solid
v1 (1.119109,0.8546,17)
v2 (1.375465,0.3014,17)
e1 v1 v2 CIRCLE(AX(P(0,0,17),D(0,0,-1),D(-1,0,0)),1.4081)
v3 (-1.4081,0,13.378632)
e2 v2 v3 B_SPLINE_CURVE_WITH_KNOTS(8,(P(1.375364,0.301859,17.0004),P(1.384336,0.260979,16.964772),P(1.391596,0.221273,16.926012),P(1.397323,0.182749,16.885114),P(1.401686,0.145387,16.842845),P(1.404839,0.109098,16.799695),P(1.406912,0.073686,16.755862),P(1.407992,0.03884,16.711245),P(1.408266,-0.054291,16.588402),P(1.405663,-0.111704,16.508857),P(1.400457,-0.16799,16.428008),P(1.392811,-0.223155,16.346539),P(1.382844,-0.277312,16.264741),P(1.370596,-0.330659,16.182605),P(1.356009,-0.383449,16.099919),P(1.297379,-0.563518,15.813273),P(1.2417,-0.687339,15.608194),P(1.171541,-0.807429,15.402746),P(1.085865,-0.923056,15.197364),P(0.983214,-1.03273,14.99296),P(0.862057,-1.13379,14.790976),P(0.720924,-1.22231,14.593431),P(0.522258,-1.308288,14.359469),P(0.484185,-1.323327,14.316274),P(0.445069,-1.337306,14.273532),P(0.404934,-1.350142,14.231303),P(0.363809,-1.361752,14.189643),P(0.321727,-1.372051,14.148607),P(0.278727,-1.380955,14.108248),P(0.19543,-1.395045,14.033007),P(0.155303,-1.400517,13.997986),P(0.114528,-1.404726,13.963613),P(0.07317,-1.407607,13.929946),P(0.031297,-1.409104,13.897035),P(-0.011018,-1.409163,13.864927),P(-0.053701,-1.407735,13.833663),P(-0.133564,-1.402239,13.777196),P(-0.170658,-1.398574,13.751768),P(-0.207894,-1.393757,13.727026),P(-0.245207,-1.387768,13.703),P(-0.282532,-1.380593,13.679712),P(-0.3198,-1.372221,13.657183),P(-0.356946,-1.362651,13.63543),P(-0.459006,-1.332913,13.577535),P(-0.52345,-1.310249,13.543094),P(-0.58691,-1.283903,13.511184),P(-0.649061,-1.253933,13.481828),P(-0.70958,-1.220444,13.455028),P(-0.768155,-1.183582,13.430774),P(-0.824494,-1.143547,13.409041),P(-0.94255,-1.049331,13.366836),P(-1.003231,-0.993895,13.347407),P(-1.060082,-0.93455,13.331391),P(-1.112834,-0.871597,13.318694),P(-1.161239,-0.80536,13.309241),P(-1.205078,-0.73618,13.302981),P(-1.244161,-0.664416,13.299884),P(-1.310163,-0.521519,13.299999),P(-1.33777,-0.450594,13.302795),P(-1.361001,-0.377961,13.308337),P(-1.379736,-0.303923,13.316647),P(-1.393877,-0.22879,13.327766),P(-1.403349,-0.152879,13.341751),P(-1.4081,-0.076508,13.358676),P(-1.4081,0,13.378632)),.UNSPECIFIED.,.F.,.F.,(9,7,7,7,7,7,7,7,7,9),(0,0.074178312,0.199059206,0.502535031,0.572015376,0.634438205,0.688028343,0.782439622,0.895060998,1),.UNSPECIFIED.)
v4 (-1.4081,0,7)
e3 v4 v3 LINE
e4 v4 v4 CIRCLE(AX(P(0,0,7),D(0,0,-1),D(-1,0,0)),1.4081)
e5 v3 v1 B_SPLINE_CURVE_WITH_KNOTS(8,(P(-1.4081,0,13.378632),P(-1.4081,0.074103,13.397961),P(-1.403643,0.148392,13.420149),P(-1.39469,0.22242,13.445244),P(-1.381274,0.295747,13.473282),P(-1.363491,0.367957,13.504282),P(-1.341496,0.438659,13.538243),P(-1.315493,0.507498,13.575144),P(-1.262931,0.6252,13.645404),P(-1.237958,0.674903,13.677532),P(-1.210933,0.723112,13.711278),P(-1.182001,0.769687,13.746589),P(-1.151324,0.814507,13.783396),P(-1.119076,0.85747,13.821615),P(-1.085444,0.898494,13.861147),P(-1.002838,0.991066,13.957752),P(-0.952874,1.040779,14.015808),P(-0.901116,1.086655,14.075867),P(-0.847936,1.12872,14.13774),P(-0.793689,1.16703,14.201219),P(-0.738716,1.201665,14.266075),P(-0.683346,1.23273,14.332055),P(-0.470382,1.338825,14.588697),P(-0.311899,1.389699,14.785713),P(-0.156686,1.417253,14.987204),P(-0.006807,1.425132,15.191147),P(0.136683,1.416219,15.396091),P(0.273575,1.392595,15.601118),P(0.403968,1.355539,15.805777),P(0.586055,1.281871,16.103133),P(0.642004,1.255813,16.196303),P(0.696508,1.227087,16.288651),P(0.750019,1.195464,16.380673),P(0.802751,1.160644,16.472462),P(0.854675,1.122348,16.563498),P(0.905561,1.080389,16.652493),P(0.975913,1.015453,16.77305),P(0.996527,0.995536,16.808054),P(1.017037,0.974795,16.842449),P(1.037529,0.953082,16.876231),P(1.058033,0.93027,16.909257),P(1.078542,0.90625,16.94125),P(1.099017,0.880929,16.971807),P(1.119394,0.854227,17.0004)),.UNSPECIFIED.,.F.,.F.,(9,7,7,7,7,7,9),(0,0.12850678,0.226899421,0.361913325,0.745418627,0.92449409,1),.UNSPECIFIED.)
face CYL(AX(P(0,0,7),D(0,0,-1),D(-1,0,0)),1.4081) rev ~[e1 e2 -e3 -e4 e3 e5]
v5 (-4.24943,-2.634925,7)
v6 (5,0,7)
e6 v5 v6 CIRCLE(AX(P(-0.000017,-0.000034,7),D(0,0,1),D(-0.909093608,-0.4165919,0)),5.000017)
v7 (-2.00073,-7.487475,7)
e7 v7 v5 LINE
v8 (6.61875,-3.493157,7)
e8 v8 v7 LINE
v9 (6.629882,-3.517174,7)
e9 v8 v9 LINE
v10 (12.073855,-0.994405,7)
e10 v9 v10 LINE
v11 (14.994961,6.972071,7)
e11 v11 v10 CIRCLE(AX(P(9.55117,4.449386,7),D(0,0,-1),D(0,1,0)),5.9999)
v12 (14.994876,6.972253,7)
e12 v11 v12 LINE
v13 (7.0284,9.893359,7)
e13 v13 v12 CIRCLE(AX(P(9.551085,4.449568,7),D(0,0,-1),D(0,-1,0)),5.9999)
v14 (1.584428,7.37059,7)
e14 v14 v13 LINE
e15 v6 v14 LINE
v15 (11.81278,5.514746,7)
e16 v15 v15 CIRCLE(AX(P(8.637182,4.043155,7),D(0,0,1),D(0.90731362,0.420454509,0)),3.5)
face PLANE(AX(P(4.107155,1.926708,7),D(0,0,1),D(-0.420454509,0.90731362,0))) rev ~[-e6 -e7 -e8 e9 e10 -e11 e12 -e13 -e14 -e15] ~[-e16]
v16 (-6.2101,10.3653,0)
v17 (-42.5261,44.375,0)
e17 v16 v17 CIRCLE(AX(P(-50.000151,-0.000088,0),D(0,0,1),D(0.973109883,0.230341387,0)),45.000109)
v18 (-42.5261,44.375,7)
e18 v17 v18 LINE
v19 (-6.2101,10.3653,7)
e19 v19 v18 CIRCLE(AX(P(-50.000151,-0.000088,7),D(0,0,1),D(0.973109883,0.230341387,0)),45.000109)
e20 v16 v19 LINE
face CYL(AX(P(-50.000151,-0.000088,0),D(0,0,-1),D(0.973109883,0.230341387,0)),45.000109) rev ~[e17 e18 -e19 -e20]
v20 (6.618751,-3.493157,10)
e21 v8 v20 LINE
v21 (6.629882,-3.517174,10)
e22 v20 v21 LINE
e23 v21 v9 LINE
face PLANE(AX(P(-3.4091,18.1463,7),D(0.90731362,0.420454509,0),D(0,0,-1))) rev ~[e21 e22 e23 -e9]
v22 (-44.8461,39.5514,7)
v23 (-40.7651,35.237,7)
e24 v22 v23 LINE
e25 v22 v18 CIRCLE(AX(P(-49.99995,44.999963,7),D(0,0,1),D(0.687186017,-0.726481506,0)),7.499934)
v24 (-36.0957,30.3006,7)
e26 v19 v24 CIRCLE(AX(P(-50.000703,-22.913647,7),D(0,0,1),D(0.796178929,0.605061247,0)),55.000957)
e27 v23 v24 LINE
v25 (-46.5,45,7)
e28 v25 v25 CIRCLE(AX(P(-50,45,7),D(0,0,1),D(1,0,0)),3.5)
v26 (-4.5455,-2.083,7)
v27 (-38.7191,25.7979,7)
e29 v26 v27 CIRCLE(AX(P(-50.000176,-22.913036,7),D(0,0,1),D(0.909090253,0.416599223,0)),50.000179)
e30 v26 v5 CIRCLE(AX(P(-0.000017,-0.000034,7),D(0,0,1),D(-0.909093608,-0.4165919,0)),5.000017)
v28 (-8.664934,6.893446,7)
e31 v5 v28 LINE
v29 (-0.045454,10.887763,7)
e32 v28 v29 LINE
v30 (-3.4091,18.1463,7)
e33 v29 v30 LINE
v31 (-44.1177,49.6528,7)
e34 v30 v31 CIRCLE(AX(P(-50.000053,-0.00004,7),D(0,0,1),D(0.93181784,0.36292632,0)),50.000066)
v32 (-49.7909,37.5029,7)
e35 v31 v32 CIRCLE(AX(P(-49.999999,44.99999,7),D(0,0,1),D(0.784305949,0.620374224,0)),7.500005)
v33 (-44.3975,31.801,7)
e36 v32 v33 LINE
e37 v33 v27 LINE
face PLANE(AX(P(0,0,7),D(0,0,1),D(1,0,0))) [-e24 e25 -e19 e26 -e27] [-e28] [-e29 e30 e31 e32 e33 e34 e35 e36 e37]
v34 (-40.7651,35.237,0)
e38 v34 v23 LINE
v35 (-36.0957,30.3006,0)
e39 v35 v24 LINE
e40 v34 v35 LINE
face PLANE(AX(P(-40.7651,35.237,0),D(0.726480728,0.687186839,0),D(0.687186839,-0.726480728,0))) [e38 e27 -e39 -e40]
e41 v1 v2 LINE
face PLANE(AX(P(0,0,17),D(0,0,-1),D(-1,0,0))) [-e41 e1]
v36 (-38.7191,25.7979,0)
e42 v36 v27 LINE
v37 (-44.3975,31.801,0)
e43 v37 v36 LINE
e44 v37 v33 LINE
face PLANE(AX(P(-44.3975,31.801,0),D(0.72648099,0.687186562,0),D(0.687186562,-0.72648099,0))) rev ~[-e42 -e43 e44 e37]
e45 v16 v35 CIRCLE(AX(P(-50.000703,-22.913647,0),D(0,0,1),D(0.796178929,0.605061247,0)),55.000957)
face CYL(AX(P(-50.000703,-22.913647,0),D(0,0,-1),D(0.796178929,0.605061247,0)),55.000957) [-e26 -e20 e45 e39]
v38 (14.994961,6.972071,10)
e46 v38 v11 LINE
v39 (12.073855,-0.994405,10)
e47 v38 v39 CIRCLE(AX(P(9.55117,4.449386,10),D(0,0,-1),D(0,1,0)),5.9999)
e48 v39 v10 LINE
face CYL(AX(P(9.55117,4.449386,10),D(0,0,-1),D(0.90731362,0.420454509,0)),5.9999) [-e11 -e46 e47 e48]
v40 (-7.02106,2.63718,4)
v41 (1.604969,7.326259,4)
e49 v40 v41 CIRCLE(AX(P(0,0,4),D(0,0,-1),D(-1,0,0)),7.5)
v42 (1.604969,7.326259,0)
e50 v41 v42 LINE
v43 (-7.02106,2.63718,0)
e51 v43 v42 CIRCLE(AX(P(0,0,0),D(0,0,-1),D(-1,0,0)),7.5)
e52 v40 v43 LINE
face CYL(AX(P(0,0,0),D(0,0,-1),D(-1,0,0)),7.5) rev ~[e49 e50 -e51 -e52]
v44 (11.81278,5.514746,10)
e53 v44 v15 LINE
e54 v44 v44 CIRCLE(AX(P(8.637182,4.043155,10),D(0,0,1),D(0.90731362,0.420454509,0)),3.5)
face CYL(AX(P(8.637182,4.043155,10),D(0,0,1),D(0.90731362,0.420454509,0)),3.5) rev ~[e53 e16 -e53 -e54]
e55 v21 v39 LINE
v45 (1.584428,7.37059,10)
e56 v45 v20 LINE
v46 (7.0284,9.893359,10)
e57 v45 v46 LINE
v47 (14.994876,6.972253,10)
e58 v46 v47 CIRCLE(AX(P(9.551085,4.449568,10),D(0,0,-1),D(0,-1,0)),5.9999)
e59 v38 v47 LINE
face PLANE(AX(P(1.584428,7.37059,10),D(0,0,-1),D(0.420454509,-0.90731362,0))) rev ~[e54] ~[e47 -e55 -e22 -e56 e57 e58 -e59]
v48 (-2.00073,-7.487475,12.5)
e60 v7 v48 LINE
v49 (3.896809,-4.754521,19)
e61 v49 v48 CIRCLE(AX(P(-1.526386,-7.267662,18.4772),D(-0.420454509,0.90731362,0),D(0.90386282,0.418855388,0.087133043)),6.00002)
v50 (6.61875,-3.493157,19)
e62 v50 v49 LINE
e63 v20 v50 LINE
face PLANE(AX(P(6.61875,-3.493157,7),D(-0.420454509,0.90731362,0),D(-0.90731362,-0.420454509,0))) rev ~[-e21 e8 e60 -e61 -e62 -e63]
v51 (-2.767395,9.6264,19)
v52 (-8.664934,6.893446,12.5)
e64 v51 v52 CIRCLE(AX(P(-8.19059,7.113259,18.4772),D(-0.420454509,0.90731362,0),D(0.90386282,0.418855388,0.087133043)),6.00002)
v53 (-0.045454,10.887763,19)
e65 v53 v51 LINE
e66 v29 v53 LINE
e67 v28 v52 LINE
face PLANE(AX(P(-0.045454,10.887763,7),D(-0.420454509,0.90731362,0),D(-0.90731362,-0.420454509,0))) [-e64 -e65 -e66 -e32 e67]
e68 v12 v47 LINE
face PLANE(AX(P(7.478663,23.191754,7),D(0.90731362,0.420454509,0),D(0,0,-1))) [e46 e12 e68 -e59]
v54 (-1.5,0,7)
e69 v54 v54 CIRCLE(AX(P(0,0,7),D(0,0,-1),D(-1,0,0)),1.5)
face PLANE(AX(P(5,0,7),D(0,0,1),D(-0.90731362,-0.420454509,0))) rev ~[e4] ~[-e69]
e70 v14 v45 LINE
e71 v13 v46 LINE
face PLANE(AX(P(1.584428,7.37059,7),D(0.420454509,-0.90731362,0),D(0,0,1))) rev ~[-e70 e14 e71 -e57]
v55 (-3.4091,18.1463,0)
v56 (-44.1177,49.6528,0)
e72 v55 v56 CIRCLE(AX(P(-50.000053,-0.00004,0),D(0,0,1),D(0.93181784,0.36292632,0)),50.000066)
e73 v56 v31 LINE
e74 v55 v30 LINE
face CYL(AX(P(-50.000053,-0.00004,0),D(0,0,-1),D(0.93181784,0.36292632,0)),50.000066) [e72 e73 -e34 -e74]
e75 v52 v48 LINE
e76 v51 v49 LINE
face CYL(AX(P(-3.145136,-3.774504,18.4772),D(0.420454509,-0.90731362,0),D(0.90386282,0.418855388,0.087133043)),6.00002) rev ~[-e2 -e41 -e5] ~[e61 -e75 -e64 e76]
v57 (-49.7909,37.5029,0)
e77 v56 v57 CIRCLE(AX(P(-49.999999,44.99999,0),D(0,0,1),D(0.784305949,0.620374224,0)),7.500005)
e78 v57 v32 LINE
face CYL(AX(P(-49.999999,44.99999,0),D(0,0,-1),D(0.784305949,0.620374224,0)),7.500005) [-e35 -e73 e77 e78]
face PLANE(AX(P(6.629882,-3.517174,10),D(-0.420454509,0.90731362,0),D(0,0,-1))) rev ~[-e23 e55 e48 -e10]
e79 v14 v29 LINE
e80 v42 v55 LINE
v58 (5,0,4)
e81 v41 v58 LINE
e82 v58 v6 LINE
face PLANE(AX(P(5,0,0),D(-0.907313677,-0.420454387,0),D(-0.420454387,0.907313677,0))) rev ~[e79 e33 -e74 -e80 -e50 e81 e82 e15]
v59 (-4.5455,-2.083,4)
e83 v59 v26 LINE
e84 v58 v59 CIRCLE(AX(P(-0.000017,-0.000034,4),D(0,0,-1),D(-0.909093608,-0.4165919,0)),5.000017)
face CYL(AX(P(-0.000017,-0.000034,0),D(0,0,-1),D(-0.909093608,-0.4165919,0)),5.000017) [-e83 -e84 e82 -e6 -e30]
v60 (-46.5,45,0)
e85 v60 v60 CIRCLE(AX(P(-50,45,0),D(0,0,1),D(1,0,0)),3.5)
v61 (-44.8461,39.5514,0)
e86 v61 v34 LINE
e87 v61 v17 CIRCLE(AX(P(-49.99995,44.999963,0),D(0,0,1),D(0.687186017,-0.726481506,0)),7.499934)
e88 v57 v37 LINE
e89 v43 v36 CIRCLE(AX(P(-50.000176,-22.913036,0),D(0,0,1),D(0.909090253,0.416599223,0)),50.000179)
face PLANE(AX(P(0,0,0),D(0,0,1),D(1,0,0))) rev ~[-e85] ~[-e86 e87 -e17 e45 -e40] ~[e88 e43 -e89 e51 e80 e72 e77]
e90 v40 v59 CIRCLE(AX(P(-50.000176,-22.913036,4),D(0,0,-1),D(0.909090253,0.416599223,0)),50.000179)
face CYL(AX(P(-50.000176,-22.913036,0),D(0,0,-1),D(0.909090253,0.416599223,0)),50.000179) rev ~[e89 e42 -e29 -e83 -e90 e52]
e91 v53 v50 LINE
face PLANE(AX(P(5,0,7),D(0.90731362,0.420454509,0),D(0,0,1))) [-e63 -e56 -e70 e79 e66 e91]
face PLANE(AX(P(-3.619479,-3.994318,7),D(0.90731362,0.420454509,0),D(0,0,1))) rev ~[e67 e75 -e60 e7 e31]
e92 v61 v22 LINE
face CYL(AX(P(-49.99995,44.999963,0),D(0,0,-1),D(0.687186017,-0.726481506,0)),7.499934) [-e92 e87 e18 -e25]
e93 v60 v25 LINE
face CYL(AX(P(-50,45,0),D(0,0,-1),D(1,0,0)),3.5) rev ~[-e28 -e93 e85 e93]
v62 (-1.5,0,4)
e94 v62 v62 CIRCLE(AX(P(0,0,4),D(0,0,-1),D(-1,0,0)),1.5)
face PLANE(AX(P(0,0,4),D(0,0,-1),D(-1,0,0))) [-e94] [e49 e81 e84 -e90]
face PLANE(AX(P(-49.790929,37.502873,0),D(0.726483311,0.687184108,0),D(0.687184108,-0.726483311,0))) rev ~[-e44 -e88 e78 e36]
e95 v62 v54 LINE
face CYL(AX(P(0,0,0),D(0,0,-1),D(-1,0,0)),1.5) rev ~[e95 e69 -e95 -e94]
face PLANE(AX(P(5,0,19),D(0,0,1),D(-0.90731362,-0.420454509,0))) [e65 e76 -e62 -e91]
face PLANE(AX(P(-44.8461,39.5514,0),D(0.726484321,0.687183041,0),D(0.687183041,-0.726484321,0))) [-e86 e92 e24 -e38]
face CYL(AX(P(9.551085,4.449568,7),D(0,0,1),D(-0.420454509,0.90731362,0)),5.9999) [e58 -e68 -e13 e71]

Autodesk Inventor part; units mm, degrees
ref_plane "YZ Plane" through (0, 0, 0) normal (1, 0, 0) x (0, 1, 0)
ref_plane "XZ Plane" through (0, 0, 0) normal (0, 1, 0) x (-1, 0, 0)
sketch "Sketch1" plane through (0, 0, 0) normal (0, 0, 1) x (1, 0, 0)
  arc A0 (-3.4091, 18.1463) -> (-44.1177, 49.6528) centre (-50, 0) ccw
  arc A1 (-4.5455, -2.083) -> (-38.7191, 25.7979) centre (-50, -22.9129) ccw
  arc A2 (-6.2101, 10.3653) -> (-42.5261, 44.375) centre (-50, 0) ccw
  line L0 (5, 0) -> (-3.4091, 18.1463)
  arc A3 (-4.5455, -2.083) -> (5, 0) centre (0, 0) ccw
  line L1 (-50, 32.0871) -> (-50, 50) construction
  line L2 (-50, 37.7239) -> (-44.3975, 31.801)
  line L3 (-44.8461, 39.5514) -> (-40.7651, 35.237)
  line L4 (-44.3975, 31.801) -> (-38.7191, 25.7979)
  line L5 (-40.7651, 35.237) -> (-36.0957, 30.3006)
  arc A4 (-6.2101, 10.3653) -> (-36.0957, 30.3006) centre (-50, -22.9129) ccw
  circle A5 centre (-50, 45) radius 3.5
  arc A6 (-44.8461, 39.5514) -> (-42.5261, 44.375) centre (-50, 45) ccw
  arc A7 (-44.1177, 49.6528) -> (-49.7909, 37.5029) centre (-50, 45) ccw
  point P0 (19.05, 139.7)
  dimension "d65" = 5
  dimension "d66" = 20
  dimension "d74" = 5
  dimension "d75" = 7
extrude "Extrusion12" add sketch "Sketch1" along normal blind 7
sketch "Sketch16" plane through (0, 0, 7) normal (0, 0, 1) x (1, 0, 0)
  point P0 (0, 0)
sketch "Sketch19" plane through (0, 0, 0) normal (0, 0, -1) x (-1, 0, 0)
  circle A0 centre (0, 0) radius 1.5
  dimension "d101" = 3
extrude "Extrusion16" cut sketch "Sketch19" against normal blind 10
sketch "Sketch24" plane through (0, 0, 0) normal (0, 0, -1) x (-1, 0, 0)
  circle A0 centre (0, 0) radius 1.5 projected
  circle A1 centre (0, 0) radius 7.5
  dimension "d115" = 15
extrude "Extrusion19" cut sketch "Sketch24" against normal blind 4
ref_plane "Work Plane9" through (5, 0, 7) normal (-0.4204545, 0.9073136, 0) x (-0.9073136, -0.4204545, 0)
sketch "Sketch25" plane through (0, 0, 7) normal (0, 0, 1) x (1, 0, 0)
  point P0 (0, 0)
sketch "Sketch26" plane through (5, 0, 7) normal (-0.4204545, 0.9073136, 0) x (-0.9073136, -0.4204545, 0)
  point P0 (4.5366, -7)
sketch "Sketch27" plane through (5, 0, 7) normal (-0.4204545, 0.9073136, 0) x (-0.9073136, -0.4204545, 0)
  line L0 (0, -7) -> (0, 0) projected
  line L1 (0, 0) -> (0, 12)
  line L2 (0, 12) -> (3, 12)
  line L3 (0, 0) -> (9.5, 0)
  line L4 (24.5467, 0) -> (5.8129, 0) projected
  line L5 (9.5, 0) -> (9.5, 5.5)
  arc A0 (3, 12) -> (9.5, 5.5) centre (8.9772, 11.4772) ccw
  point P0 (4.5366, -7)
  dimension "d118" = 12
  dimension "d119" = 3
  dimension "d120" = 9.5
  dimension "d121" = 5.5
  dimension "d122" = 6
extrude "Extrusion20" add sketch "Sketch27" along normal blind 12 and the other way blind 3.85
sketch "Sketch30" plane through (0, 0, 4) normal (0, 0, -1) x (-1, 0, 0)
  line L0 (0, 0) -> (-4.9989, 2.3165)
  line L1 (-5, 0) -> (-1.605, 7.3263) projected
sketch "Sketch31" plane through (-3.4091, 18.1463, 7) normal (0.9073136, 0.4204545, 0) x (0, 0, -1)
  line L0 (-15.8, -20) -> (10.8, -20) projected
  line L1 (3, -17.8765) -> (3, -12.5529) projected
  line L2 (3, -17.8765) -> (3, -11.8765)
  line L3 (3, -11.8765) -> (0, -11.8765)
  line L4 (3, -17.8765) -> (0, -17.8765) projected
  line L5 (3, -17.8765) -> (3, -23.8765)
  line L6 (3, -17.8765) -> (3, -22.8977) projected
  line L7 (0, -11.8765) -> (-3, -11.8765)
  line L8 (-3, -11.8765) -> (-3, -23.8765)
  line L9 (-3, -23.8765) -> (0, -23.8765)
  line L10 (0, -23.8765) -> (0, -11.8765)
  point P0 (7, -17.8977)
  point P1 (3, -20)
  dimension "d129" = 6
  dimension "d130" = 3
  dimension "d131" = 6
  dimension "d132" = 3
extrude "Extrusion21" add sketch "Sketch31" along normal blind 12 contours L8 L7 L10 L0 | L0 L10 L9 L8
sketch "Sketch32" plane through (6.6188, -3.4932, 10) normal (0, 0, 1) x (0.9073136, 0.4204545, 0)
  line L0 (0, 11.9735) -> (0, 3.85) projected
  line L1 (0, 6) -> (5, 5.9892) construction
  circle A0 centre (5, 5.9892) radius 3.5
  line L2 (6, 11.9735) -> (6, -0.0265) construction
  arc A1 (0, 6.0179) -> (0, 5.9604) centre (5, 5.9892) ccw
  line L3 (6, -0.0265) -> (12, -0.0265)
  point P0 (-4.5366, 5.9523)
  point P1 (12, 11.9735)
  dimension "d139" = 5
  dimension "d140" = 7
extrude "Extrusion22" cut sketch "Sketch32" against normal blind 3
fillet "Fillet5" radius 6 2 edges at (12.4722, 12.416, 8.5) (17.5177, 1.5283, 8.5)
sketch "Sketch33" plane through (0, 0, 7) normal (0, 0, -1) x (-1, 0, 0)
  circle A0 centre (0, 0) radius 1.4081
extrude "Extrusion23" cut sketch "Sketch33" against normal blind 10
properties part number "Beta_index"
